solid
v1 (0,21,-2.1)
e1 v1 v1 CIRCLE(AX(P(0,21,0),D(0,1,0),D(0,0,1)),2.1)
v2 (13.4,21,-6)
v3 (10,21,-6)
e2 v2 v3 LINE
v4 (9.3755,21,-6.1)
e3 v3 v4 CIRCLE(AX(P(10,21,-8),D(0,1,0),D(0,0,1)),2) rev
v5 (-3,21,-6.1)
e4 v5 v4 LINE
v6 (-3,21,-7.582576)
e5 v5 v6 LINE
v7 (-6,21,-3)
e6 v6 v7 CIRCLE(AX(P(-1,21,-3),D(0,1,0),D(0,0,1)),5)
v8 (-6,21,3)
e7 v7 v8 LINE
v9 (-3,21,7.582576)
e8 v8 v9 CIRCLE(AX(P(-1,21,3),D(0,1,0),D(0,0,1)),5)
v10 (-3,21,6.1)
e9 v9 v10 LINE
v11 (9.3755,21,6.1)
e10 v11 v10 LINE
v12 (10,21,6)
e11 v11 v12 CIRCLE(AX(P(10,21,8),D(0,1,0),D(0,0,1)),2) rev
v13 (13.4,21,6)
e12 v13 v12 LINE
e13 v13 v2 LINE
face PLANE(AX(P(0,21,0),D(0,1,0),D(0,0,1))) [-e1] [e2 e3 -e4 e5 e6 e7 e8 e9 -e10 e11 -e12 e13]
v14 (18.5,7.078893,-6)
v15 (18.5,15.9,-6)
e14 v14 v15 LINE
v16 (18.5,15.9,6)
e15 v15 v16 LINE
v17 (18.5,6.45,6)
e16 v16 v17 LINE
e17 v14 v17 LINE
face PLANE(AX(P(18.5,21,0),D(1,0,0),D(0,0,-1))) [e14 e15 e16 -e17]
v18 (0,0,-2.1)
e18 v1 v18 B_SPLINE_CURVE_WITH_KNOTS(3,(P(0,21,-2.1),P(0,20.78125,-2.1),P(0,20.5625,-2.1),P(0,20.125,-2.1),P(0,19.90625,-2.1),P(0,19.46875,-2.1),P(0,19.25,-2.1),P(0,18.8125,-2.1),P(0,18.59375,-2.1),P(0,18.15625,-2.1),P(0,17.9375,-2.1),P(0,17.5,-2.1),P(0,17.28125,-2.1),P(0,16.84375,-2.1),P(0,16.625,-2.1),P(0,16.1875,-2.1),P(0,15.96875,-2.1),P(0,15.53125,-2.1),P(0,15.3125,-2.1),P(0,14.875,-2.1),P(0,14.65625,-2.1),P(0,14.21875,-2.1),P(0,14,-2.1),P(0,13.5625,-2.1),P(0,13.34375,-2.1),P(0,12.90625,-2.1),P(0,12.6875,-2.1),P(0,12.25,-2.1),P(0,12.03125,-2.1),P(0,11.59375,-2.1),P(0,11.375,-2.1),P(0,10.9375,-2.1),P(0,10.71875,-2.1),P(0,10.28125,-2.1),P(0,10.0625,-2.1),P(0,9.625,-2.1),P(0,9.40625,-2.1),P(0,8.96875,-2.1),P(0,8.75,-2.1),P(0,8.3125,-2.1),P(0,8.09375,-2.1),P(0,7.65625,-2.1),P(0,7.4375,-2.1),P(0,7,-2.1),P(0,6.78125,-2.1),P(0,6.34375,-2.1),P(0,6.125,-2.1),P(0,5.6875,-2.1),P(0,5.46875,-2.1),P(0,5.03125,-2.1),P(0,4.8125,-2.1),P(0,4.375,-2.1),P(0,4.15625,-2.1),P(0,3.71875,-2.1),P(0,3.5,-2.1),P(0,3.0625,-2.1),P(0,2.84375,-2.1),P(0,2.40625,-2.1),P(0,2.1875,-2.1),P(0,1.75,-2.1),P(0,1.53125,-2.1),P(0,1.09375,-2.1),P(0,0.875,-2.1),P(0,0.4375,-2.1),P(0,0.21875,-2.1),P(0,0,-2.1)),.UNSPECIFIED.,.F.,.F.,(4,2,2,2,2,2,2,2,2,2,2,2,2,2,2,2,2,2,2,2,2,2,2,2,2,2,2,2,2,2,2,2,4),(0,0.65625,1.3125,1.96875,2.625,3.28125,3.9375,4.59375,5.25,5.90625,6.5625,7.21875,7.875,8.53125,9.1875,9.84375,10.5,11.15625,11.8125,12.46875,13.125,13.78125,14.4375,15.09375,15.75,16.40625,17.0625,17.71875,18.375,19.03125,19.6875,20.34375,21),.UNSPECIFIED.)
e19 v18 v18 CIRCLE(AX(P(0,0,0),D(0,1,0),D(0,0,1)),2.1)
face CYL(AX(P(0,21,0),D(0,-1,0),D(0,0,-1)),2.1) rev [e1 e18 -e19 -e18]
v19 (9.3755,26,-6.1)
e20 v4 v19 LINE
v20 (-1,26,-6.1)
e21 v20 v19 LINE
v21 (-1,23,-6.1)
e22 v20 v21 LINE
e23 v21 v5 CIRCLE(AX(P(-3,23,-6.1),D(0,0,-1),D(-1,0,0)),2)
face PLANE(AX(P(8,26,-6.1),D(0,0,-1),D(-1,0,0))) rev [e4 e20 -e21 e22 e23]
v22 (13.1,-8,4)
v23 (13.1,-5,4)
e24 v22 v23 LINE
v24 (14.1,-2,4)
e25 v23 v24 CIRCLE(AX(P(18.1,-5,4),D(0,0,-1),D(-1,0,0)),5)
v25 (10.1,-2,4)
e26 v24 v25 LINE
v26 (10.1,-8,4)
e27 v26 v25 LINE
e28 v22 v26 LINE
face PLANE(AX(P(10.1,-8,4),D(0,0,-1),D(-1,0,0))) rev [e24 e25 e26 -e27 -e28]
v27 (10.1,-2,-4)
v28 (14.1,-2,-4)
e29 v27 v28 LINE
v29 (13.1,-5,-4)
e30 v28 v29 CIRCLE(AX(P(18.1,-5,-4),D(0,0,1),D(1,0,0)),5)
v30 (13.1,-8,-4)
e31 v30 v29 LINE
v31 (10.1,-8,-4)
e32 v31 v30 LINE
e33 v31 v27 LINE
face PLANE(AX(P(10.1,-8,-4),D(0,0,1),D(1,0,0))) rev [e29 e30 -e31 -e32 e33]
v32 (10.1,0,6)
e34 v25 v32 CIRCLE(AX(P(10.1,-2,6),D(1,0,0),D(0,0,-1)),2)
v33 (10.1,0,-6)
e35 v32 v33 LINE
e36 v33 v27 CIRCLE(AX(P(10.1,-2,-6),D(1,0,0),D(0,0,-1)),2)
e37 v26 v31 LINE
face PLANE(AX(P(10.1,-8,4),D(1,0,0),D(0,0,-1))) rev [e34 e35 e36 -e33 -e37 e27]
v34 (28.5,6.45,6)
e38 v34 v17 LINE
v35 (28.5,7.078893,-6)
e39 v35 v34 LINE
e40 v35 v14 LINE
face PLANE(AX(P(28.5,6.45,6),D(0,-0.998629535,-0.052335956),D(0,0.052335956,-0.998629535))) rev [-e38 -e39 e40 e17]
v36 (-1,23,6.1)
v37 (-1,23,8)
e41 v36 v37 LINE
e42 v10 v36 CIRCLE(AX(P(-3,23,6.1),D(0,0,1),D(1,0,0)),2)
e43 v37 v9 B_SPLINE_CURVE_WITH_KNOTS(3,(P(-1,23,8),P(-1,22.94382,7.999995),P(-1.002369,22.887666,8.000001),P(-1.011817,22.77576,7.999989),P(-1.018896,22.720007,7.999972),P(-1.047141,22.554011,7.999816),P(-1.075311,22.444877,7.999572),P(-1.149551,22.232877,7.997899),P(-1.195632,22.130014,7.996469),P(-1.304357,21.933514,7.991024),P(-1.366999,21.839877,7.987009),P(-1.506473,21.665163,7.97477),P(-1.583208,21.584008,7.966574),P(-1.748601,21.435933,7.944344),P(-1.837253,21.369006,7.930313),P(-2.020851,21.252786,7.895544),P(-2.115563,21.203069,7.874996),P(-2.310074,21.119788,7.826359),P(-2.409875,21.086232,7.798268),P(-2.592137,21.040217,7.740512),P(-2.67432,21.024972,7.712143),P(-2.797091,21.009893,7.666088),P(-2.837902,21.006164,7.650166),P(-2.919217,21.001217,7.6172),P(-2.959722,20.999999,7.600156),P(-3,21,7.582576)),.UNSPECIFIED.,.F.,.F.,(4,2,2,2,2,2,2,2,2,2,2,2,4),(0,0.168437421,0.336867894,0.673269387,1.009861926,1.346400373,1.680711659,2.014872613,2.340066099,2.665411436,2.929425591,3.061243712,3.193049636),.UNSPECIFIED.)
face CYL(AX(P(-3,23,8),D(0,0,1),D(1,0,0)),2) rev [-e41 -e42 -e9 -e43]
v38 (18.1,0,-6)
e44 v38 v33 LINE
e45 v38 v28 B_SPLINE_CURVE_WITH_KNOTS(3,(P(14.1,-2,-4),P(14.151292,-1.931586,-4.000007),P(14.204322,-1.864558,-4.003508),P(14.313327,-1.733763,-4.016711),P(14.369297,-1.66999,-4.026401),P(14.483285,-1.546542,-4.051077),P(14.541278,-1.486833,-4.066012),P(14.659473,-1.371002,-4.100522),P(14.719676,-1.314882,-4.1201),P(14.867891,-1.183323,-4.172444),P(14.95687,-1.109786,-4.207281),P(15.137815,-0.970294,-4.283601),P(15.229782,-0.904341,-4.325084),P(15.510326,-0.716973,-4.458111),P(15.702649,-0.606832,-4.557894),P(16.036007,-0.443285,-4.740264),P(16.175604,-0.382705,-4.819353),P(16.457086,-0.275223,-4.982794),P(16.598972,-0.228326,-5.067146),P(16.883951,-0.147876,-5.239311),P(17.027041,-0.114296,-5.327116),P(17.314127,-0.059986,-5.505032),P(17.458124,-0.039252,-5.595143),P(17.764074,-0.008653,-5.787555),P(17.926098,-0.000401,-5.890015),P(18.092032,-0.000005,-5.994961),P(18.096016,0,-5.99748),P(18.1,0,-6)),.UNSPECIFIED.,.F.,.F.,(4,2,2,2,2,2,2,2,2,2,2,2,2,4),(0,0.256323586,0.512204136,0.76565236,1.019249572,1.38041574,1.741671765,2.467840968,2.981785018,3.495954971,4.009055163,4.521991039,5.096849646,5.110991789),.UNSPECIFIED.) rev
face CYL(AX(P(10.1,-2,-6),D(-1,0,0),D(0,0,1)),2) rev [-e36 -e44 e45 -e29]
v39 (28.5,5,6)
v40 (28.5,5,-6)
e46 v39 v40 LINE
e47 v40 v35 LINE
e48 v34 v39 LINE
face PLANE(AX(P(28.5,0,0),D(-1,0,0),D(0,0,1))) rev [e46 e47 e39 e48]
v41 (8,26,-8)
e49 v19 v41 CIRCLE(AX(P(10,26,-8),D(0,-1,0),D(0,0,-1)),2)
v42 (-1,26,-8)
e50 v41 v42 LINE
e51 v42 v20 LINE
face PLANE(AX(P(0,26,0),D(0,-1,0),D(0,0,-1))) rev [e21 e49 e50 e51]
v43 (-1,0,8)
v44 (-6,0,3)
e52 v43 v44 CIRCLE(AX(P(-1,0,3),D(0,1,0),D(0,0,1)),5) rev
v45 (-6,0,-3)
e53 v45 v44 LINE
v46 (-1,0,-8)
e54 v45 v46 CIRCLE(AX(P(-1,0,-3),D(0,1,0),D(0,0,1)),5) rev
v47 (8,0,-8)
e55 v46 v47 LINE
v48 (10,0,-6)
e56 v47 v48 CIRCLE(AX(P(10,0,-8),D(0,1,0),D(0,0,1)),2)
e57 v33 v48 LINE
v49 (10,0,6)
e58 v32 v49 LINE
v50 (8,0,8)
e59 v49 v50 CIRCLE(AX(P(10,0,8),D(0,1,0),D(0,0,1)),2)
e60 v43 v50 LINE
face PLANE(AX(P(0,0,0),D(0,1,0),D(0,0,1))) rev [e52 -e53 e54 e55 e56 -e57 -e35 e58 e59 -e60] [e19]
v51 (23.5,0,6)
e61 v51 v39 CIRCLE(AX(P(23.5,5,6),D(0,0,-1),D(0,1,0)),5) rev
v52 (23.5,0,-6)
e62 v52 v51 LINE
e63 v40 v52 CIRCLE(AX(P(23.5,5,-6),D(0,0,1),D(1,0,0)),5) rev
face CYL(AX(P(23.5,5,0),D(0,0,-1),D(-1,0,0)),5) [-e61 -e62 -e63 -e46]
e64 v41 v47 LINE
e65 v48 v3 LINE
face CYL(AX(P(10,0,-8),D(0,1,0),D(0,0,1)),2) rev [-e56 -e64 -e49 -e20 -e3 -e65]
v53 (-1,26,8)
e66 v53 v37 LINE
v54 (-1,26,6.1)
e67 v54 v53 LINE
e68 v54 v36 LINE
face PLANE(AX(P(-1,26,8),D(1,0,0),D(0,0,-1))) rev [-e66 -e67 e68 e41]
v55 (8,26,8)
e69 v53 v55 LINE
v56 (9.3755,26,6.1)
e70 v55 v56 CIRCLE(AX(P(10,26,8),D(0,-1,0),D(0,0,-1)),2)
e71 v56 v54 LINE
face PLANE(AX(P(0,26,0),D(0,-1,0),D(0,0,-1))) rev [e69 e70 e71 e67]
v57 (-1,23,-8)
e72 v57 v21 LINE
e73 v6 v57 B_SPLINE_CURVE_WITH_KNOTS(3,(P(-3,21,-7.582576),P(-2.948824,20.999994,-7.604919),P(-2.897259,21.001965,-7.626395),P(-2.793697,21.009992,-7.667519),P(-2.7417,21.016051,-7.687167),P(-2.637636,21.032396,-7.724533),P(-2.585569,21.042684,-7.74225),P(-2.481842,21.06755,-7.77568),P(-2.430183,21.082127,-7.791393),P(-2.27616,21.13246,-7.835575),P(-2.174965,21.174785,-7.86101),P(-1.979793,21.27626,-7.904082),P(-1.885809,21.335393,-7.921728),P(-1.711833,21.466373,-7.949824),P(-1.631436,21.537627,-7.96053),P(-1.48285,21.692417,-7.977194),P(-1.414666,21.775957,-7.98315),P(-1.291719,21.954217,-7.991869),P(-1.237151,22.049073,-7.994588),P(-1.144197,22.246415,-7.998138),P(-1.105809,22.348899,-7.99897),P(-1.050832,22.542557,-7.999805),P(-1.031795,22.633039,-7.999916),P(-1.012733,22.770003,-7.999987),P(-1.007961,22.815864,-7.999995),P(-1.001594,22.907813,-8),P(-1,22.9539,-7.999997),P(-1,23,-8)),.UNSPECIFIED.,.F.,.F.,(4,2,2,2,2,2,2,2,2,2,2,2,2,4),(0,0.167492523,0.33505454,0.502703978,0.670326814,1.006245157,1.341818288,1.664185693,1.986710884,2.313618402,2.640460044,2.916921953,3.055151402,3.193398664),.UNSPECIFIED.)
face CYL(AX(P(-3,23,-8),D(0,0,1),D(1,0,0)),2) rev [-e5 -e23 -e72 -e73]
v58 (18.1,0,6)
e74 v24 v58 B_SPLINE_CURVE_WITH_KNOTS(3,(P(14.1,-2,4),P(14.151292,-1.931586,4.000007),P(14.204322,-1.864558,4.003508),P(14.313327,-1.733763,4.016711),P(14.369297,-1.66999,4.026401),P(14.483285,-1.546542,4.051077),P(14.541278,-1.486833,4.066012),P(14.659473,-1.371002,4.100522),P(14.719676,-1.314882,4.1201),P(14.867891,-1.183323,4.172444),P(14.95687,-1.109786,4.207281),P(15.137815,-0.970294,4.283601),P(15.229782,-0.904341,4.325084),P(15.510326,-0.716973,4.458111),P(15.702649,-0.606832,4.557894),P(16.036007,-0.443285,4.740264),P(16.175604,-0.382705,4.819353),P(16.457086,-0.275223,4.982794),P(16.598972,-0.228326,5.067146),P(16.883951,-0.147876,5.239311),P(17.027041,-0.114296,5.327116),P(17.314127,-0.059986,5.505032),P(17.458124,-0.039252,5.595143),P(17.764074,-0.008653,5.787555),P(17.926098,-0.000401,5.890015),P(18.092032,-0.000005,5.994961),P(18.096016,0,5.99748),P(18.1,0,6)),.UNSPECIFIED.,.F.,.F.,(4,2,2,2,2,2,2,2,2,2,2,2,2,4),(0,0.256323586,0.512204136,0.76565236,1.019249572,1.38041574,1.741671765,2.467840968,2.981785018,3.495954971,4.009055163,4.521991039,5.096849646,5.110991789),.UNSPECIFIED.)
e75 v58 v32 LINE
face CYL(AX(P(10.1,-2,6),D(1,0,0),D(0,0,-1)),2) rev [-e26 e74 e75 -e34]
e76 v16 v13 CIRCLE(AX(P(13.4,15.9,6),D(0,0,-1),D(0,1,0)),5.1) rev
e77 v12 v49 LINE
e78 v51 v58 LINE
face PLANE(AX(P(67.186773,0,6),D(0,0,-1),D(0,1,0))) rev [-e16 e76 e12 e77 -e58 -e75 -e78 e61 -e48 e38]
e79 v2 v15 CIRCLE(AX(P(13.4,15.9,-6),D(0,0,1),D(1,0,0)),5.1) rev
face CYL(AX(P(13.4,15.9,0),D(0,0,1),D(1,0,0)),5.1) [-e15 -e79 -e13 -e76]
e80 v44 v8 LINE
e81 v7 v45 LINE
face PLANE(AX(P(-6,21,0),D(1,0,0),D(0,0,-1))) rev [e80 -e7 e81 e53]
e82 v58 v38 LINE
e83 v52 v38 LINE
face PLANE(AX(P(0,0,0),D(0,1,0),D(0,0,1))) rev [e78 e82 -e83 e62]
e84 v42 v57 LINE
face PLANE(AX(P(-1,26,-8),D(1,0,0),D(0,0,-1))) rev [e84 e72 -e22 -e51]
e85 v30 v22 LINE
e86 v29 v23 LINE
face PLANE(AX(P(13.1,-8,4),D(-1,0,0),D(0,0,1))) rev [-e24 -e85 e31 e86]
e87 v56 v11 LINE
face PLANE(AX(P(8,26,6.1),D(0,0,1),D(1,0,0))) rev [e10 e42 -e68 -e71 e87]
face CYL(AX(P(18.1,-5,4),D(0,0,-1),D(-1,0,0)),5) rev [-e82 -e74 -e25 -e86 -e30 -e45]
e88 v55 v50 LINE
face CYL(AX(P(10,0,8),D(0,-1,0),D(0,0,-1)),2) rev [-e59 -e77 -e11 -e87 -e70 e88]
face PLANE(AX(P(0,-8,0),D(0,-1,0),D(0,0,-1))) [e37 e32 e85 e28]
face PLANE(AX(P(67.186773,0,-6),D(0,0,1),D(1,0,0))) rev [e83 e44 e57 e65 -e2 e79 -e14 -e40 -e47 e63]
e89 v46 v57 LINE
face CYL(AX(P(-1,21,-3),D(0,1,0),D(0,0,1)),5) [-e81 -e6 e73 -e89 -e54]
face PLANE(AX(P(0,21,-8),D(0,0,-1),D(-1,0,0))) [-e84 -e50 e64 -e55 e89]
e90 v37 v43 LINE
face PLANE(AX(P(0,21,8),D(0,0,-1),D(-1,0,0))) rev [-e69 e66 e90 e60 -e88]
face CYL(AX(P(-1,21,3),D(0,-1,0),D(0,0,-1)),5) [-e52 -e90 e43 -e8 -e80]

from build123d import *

# Parameters (mm, degrees)
SKETCH1_W           = 12
SKETCH1_H           = 16
SKETCH1_R           = 2.1
SKETCH1_W_2         = 2
BOSS_EXTRUDE1_DEPTH = 21
FILLET1_R           = 5
SKETCH2_W           = 9
SKETCH2_H           = 1.9
BOSS_EXTRUDE2_DEPTH = 5
SKETCH4_W           = 12
SKETCH4_H           = 21
BOSS_EXTRUDE3_DEPTH = 10.5
FILLET2_R           = 5.1
FILLET4_R           = 2
SKETCH6_W           = 3
SKETCH6_H           = 8
BOSS_EXTRUDE5_DEPTH = 8
FILLET6_R           = 2
FILLET8_R           = 5
BOSS_EXTRUDE6_DEPTH = 10
FILLET9_R           = 5


with BuildPart() as part:
    # Sketch1 → Boss-Extrude1 (new body)
    # profile 1 of 2: a face of its own
    with BuildSketch(Plane(origin=(0, 0, 0), x_dir=(1, 0, 0), z_dir=(0, 1, 0))):
        Rectangle(SKETCH1_W, SKETCH1_H)
        with Locations(Location((0, 0, 0), (0, 0, 90))):
            Circle(SKETCH1_R, mode=Mode.SUBTRACT)
    # profile 2 of 2: a face of its own
    with BuildSketch(Plane(origin=(0, 0, 0), x_dir=(1, 0, 0), z_dir=(0, 1, 0))):
        with Locations((7, 0)):
            Rectangle(SKETCH1_W_2, SKETCH1_H)
    extrude(amount=BOSS_EXTRUDE1_DEPTH)

    # Fillet1
    fillet1_edges = [part.edges().sort_by_distance(p)[0] for p in [
        (-6, 10.5, 8),
        (-6, 10.5, -8),
    ]]
    fillet(fillet1_edges, radius=FILLET1_R)

    # Sketch2 → Boss-Extrude2 (add)
    with BuildSketch(Plane(origin=(0, 21, 0), x_dir=(1, 0, 0), z_dir=(0, 1, 0))):
        with Locations((3.5, 7.05)):
            Rectangle(SKETCH2_W, SKETCH2_H)
        with Locations((3.5, -7.05)):
            Rectangle(SKETCH2_W, SKETCH2_H)
    extrude(amount=BOSS_EXTRUDE2_DEPTH)

    # Sketch4 → Boss-Extrude3 (add)
    with BuildSketch(Plane(origin=(8, 0, 0), x_dir=(0, 0, -1), z_dir=(1, 0, 0))):
        with Locations((0, 10.5)):
            Rectangle(SKETCH4_W, SKETCH4_H)
    extrude(amount=BOSS_EXTRUDE3_DEPTH)

    # Fillet2
    fillet2_edges = [part.edges().sort_by_distance(p)[0] for p in [
        (18.5, 21, 0),
    ]]
    fillet(fillet2_edges, radius=FILLET2_R)

    # Fillet4
    fillet4_edges = [part.edges().sort_by_distance(p)[0] for p in [
        (-1, 21, -7.05),
        (-1, 21, 7.05),
        (8, 10.5, -6),
        (8, 10.5, 6),
    ]]
    fillet(fillet4_edges, radius=FILLET4_R - 0.0001)  # a hair under: the kernel refuses the full size

    # Sketch6 → Boss-Extrude5 (add)
    with BuildSketch(Plane.XZ):
        with Locations((11.6, 0)):
            Rectangle(SKETCH6_W, SKETCH6_H)
    extrude(amount=BOSS_EXTRUDE5_DEPTH)

    # Fillet6
    fillet6_edges = [part.edges().sort_by_distance(p)[0] for p in [
        (11.6, 0, -4),
        (11.6, 0, 4),
    ]]
    fillet(fillet6_edges, radius=FILLET6_R - 0.0001)  # a hair under: the kernel refuses the full size

    # Fillet8
    fillet8_edges = [part.edges().sort_by_distance(p)[0] for p in [
        (13.1, 0, 0),
    ]]
    fillet(fillet8_edges, radius=FILLET8_R)

    # Sketch7 → Boss-Extrude6 (add)
    with BuildSketch(Plane(origin=(18.5, 0, 0), x_dir=(0, 0, -1), z_dir=(1, 0, 0))):
        Polygon((-6, 0), (-6, 6.45), (6, 7.078893351), (6, 0), align=None)
    extrude(amount=BOSS_EXTRUDE6_DEPTH)

    # Fillet9
    fillet9_edges = [part.edges().sort_by_distance(p)[0] for p in [
        (28.5, 0, 0),
    ]]
    fillet(fillet9_edges, radius=FILLET9_R)


solid = part.part
